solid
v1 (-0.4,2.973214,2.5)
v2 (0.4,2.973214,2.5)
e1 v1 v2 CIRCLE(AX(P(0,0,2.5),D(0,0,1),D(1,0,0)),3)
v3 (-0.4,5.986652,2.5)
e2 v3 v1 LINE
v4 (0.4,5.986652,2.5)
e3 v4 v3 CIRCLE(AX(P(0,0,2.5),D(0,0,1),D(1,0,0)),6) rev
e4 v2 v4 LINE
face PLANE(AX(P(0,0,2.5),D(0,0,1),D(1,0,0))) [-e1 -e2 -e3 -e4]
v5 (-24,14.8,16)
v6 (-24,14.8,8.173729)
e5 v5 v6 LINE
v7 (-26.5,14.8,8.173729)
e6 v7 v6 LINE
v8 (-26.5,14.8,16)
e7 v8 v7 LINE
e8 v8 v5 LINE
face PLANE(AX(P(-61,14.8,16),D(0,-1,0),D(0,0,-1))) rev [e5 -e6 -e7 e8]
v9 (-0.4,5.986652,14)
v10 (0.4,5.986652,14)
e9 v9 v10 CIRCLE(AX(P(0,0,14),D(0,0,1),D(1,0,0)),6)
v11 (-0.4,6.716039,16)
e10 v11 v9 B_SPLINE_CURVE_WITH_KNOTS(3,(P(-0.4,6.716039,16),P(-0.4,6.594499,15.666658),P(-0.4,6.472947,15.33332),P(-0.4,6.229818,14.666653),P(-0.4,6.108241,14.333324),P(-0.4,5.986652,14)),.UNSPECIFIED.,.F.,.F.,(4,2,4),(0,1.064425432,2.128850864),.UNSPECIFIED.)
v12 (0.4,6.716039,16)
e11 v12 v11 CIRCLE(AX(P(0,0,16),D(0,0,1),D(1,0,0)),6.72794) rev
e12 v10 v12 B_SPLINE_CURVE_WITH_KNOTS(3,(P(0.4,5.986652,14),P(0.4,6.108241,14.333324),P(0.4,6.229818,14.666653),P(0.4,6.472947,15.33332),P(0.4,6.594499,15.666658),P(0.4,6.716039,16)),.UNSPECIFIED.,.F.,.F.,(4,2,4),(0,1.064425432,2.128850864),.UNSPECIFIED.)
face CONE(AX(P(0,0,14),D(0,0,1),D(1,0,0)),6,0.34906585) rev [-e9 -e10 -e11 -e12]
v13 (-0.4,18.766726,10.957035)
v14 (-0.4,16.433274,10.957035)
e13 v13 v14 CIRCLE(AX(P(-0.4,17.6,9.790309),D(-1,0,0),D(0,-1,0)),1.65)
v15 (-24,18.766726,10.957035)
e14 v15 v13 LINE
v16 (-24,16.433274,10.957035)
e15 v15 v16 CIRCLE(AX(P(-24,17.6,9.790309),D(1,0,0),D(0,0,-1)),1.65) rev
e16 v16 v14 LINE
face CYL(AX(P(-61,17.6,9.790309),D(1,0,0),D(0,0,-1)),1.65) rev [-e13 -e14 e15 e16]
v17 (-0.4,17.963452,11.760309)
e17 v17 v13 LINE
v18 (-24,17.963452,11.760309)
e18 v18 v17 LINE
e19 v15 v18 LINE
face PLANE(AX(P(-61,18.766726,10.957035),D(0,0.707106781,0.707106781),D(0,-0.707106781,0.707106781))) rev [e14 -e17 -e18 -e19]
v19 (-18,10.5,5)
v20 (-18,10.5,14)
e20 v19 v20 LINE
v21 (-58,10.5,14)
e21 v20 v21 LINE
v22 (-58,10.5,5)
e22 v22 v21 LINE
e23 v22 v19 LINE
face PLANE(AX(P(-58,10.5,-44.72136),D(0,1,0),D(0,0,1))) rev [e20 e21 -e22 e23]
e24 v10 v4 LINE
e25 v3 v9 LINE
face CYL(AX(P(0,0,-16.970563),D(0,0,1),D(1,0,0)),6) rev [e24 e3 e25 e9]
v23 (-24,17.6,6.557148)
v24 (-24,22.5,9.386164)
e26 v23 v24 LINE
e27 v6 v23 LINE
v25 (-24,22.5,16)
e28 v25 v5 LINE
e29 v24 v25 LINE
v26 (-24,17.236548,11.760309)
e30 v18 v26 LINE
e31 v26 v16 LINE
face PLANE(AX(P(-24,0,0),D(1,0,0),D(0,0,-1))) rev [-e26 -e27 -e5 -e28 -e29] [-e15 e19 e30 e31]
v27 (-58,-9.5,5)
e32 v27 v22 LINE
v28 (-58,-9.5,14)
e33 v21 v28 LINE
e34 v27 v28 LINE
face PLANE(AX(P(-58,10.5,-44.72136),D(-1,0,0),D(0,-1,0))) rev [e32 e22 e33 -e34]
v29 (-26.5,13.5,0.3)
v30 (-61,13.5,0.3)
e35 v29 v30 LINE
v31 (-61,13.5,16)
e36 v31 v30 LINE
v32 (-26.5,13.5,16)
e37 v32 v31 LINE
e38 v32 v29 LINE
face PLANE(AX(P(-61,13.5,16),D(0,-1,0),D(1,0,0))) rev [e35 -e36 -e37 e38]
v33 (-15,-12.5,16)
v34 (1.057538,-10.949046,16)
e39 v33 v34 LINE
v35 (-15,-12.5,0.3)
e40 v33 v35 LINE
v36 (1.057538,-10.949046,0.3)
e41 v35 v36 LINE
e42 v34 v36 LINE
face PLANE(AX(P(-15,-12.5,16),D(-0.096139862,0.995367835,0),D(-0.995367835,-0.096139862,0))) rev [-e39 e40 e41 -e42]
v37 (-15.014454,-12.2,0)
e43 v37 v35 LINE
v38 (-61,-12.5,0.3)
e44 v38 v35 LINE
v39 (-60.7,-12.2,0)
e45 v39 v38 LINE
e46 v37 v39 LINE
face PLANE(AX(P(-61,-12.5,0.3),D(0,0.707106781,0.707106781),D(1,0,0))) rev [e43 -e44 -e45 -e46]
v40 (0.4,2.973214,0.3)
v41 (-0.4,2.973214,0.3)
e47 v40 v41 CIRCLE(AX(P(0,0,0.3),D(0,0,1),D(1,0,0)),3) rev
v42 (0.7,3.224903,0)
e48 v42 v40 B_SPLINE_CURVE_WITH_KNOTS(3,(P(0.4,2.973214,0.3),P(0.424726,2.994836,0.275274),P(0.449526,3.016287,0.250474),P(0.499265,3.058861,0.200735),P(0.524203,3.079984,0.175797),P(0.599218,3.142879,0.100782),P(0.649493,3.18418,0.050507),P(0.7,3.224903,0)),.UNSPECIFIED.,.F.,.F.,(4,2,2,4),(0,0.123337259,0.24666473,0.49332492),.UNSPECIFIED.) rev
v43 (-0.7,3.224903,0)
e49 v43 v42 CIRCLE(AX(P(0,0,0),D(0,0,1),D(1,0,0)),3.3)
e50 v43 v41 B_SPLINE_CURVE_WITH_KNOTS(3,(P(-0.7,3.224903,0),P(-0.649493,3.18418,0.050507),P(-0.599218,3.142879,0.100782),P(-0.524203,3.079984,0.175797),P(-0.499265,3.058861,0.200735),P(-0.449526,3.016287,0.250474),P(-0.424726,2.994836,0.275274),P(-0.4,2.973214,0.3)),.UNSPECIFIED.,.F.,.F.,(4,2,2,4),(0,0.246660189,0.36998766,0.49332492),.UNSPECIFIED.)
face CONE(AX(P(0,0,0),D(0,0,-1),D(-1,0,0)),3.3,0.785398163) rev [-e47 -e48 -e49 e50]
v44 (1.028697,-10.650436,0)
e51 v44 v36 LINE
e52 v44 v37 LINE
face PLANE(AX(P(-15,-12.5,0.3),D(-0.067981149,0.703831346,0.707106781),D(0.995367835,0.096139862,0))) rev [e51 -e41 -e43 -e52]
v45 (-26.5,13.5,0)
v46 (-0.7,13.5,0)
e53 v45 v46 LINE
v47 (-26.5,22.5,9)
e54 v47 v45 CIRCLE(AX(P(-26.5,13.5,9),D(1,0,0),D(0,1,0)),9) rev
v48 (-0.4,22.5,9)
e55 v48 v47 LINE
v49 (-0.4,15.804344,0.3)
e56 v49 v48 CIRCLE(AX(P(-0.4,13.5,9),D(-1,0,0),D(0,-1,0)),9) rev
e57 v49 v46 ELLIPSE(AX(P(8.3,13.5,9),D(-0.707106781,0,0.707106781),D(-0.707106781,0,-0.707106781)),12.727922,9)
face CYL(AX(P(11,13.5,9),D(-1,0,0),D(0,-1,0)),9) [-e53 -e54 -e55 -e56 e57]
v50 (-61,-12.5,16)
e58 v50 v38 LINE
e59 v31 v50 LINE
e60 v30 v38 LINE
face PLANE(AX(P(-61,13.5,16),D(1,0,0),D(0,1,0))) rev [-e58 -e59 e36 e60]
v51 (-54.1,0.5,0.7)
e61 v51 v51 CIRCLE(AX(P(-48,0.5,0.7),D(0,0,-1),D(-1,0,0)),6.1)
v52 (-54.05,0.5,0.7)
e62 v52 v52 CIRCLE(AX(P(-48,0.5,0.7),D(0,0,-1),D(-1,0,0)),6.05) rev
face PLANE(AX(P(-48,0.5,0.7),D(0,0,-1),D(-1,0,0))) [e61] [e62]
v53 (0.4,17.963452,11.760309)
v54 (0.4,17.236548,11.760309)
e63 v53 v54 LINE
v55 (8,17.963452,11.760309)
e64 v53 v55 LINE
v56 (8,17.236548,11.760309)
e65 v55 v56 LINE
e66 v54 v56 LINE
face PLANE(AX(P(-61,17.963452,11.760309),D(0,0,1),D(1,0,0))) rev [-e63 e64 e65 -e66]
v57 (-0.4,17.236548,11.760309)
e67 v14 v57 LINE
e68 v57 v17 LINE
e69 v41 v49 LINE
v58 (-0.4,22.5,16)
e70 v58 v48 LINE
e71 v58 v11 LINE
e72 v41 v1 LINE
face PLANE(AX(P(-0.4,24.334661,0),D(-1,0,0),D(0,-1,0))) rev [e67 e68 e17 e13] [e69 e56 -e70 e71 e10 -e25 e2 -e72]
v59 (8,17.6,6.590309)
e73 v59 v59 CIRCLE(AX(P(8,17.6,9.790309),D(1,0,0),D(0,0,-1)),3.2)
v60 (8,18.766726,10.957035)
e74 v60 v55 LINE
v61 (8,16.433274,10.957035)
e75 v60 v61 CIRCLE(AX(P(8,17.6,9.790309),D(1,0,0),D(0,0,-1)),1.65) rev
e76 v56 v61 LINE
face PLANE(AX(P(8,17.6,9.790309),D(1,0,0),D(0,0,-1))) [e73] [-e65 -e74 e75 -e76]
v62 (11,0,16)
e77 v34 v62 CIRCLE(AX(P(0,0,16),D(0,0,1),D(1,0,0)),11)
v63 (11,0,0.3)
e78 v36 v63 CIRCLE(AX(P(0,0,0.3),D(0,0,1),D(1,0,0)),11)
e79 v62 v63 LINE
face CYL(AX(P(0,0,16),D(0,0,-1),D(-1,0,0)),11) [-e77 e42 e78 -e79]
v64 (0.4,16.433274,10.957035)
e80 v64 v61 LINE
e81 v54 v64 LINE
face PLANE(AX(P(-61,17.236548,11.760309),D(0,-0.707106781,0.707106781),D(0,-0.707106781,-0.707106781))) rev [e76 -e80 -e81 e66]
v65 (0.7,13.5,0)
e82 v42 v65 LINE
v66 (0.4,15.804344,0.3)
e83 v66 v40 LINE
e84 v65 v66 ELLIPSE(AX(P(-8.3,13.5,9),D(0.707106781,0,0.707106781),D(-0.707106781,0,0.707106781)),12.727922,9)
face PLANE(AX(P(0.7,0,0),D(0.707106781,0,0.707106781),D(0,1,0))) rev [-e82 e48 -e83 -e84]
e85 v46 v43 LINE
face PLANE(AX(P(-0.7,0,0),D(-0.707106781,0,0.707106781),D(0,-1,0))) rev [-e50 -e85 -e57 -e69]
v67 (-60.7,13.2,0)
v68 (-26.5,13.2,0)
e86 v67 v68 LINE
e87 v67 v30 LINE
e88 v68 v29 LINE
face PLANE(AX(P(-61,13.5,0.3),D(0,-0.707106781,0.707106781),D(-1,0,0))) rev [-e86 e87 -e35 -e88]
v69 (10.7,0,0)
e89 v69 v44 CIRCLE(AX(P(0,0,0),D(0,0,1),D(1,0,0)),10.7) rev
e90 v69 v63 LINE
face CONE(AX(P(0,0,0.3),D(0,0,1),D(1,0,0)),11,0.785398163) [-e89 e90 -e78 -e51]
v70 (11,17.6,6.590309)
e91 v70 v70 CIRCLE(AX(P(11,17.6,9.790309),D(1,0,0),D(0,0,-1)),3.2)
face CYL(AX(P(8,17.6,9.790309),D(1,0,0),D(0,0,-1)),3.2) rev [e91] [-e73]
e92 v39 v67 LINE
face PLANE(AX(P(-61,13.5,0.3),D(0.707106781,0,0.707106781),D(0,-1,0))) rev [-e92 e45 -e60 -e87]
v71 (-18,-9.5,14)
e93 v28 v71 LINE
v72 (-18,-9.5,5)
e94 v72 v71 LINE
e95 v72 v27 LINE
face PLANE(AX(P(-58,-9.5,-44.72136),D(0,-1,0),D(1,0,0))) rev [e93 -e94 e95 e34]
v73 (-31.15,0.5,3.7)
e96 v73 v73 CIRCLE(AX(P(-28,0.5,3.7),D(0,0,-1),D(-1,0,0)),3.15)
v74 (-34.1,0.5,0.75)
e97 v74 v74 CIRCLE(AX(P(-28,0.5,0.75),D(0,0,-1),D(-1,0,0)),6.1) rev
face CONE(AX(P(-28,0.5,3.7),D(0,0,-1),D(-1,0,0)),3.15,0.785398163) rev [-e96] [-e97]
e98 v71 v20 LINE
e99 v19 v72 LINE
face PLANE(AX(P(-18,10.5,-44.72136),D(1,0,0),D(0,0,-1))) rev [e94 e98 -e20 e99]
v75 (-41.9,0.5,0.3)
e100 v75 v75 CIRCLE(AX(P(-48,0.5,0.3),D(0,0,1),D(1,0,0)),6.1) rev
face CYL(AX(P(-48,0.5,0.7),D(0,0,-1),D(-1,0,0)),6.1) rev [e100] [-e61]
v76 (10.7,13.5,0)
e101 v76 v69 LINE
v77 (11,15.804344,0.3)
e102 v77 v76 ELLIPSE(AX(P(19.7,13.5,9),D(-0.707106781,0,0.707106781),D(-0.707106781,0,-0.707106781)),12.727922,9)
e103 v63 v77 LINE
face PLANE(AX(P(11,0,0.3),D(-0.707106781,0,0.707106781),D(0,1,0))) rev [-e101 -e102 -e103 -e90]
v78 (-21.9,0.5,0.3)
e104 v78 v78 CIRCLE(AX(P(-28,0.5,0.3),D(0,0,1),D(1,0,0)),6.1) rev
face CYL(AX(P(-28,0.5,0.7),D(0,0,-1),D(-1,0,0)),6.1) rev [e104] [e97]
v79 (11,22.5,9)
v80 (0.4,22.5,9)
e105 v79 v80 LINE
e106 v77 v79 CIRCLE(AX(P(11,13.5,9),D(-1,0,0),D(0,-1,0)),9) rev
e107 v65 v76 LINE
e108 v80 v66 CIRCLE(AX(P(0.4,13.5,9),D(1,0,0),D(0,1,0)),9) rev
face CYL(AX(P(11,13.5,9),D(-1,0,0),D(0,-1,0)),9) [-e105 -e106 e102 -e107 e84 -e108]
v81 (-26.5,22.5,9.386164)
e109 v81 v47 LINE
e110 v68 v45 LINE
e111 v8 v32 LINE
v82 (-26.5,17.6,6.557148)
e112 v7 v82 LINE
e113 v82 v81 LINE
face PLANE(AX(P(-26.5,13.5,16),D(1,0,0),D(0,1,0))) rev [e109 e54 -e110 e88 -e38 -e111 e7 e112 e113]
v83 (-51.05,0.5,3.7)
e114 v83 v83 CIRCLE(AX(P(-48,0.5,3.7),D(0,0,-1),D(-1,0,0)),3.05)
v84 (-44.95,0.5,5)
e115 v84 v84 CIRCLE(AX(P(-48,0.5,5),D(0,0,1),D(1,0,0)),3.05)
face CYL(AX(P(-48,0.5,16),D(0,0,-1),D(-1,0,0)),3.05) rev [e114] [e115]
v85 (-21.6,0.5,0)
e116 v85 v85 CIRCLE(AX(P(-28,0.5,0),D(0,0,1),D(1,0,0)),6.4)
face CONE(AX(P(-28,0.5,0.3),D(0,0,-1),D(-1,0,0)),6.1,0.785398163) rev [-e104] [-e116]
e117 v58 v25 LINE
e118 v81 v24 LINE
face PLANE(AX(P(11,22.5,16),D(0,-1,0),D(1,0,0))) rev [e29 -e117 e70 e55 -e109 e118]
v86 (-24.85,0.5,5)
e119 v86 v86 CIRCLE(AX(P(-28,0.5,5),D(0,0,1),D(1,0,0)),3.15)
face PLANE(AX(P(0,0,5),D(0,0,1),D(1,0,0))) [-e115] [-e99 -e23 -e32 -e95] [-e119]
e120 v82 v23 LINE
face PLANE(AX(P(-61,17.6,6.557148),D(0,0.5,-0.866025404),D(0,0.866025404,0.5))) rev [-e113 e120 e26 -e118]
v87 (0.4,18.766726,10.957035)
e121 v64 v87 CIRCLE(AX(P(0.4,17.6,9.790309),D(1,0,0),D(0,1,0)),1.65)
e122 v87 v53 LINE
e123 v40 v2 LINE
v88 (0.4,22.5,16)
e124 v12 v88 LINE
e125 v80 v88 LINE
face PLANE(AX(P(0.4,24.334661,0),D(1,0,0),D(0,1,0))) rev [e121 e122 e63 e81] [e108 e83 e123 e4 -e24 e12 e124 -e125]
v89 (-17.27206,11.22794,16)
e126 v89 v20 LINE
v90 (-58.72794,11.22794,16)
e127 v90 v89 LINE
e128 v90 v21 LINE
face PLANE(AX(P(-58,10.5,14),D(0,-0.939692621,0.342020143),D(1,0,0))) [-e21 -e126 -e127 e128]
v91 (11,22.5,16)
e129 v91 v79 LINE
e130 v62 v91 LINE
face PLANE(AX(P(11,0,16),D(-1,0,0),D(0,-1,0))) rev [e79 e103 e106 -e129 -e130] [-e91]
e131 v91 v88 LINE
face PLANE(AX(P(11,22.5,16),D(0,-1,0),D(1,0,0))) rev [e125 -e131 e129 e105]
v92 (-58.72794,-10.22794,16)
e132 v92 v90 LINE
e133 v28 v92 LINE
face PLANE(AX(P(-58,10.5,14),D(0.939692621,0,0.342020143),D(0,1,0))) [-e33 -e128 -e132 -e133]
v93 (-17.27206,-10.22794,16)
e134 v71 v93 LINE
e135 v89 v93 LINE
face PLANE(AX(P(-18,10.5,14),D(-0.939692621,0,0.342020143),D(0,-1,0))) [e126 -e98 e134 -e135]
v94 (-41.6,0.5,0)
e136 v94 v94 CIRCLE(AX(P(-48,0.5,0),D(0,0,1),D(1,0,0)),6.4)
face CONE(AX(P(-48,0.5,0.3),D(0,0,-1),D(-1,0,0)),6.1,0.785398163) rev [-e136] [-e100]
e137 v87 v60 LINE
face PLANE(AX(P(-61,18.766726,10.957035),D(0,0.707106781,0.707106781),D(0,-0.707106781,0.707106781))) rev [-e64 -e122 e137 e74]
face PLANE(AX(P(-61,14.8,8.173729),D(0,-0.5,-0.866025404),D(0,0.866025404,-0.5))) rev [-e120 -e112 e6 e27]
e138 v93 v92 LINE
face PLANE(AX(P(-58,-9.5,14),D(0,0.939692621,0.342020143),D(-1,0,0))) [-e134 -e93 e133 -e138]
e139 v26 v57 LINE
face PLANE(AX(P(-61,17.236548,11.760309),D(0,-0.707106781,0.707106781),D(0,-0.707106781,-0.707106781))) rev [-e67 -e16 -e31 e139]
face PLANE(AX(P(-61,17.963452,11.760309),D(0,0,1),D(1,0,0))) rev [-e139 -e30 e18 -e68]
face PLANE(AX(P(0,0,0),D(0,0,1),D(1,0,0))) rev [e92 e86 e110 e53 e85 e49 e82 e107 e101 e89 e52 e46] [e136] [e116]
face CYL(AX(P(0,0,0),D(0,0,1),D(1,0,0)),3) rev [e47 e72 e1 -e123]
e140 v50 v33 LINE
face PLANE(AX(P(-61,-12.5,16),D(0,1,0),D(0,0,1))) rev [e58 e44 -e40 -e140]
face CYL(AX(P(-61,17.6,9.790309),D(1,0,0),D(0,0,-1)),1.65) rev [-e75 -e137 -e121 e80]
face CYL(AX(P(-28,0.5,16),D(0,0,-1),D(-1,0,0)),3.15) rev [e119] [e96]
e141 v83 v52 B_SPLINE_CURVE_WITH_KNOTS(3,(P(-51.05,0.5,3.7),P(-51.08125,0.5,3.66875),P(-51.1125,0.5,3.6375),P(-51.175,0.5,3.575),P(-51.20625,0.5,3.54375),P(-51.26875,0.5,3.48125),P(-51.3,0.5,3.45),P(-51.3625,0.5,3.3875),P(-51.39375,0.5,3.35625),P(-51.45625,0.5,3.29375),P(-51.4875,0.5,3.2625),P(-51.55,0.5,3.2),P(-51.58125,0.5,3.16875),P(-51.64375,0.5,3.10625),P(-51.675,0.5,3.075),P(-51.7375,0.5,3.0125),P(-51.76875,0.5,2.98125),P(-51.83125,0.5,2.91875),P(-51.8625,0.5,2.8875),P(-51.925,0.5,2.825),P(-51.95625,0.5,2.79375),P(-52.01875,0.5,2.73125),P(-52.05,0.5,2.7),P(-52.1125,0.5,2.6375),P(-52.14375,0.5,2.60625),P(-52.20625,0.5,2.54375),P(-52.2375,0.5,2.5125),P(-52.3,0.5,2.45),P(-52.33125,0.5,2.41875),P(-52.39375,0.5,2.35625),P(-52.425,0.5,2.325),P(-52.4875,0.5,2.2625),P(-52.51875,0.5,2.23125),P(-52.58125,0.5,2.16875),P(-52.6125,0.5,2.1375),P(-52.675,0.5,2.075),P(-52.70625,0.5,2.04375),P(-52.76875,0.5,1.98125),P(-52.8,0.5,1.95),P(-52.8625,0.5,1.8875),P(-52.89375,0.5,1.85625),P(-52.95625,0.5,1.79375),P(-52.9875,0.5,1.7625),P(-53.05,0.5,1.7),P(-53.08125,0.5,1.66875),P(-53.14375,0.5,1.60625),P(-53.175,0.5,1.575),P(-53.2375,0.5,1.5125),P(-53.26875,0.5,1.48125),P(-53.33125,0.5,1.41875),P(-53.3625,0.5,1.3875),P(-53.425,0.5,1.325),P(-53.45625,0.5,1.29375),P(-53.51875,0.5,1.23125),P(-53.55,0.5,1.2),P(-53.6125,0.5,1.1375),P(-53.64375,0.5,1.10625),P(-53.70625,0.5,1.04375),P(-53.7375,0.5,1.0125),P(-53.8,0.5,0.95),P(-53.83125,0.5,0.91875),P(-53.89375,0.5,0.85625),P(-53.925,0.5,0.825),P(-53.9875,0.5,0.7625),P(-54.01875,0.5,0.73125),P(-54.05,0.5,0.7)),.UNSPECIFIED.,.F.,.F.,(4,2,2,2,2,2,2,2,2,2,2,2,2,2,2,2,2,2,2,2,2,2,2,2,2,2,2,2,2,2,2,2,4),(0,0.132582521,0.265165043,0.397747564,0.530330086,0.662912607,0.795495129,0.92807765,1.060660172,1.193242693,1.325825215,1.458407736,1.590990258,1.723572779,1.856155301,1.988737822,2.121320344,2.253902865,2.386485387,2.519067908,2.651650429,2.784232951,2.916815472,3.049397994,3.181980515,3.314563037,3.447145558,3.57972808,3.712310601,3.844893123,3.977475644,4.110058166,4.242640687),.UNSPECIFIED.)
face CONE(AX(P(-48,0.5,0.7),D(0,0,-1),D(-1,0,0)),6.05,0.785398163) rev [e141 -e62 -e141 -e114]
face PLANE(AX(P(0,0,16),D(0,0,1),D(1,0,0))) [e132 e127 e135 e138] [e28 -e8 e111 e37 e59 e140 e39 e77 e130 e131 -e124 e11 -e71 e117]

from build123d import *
from OCP.BRepFilletAPI import BRepFilletAPI_MakeChamfer

# Parameters (mm, degrees)
SKETCH1_R           = 2.5
SKETCH1_R_2         = 3.15
BOSS_EXTRUDE1_DEPTH = 16
SKETCH2_W           = 40
SKETCH2_H           = 20
CUT_EXTRUDE1_DEPTH  = 11
FILLET2_R           = 9
SKETCH3_R           = 6
CUT_EXTRUDE2_DEPTH  = 13.5
CUT_EXTRUDE5_DEPTH  = 67.957075802
SKETCH7_R           = 3.05
CUT_EXTRUDE6_DEPTH  = 67.957075802
CHAMFER2_SIZE       = 2
CHAMFER2_SIZE2      = 0.727940469
SKETCH10_R          = 6.1
CUT_EXTRUDE8_DEPTH  = 0.7
CHAMFER3_SIZE       = 3
CHAMFER4_SIZE       = 0.3
SKETCH11_R          = 1.65
CUT_EXTRUDE9_DEPTH  = 78.111931632
SKETCH12_R          = 3.2
CUT_EXTRUDE10_DEPTH = 3
CUT_EXTRUDE11_START = -35
CUT_EXTRUDE11_DEPTH = 43.111931632
CHAMFER5_SIZE       = 2
CHAMFER5_SIZE2      = 0.727940469
CUT_EXTRUDE12_DEPTH = 78.111931632


with BuildPart() as part:
    # Sketch1 → Boss-Extrude1 (new body)
    with BuildSketch(Plane.XY):
        with BuildLine():
            Line((-61, 13.5), (-61, -12.5))
            Line((-61, -12.5), (-15, -12.5))
            Line((-15, -12.5), (1.057538487, -10.949046184))
            ThreePointArc((1.057538487, -10.949046184), (8.143491983, -7.394831866), (11, 0))
            Line((11, 0), (11, 22.5))
            Line((11, 22.5), (-26.5, 22.5))
            Line((-26.5, 22.5), (-26.5, 13.5))
            Line((-26.5, 13.5), (-61, 13.5))
        make_face()
        with Locations((-48, 0.5)):
            Circle(SKETCH1_R, mode=Mode.SUBTRACT)
        with Locations((-28, 0.5)):
            Circle(SKETCH1_R_2, mode=Mode.SUBTRACT)
    extrude(amount=BOSS_EXTRUDE1_DEPTH)

    # Sketch2 → Cut-Extrude1 (cut)
    with BuildSketch(Plane.XY.offset(16)):
        with Locations((-38, 0.5)):
            Rectangle(SKETCH2_W, SKETCH2_H)
    extrude(amount=-CUT_EXTRUDE1_DEPTH, mode=Mode.SUBTRACT)

    # Fillet2
    fillet2_edges = [part.edges().sort_by_distance(p)[0] for p in [
        (-7.75, 22.5, 0),
    ]]
    fillet(fillet2_edges, radius=FILLET2_R)

    # Sketch3 → Cut-Extrude2 (cut)
    with BuildSketch(Plane.XY.offset(16)):
        Circle(SKETCH3_R)
    extrude(amount=-CUT_EXTRUDE2_DEPTH, mode=Mode.SUBTRACT)

    # Sketch6 → Cut-Extrude5 (cut, through all)
    with BuildSketch(Plane.XY.offset(16)):
        with BuildLine():
            Line((-0.4, 24.334661422), (0.4, 24.334661422))
            Line((0.4, 24.334661422), (0.4, 2.973213749))
            ThreePointArc((0.4, 2.973213749), (0, -3), (-0.4, 2.973213749))
            Line((-0.4, 2.973213749), (-0.4, 24.334661422))
        make_face()
    extrude(amount=-CUT_EXTRUDE5_DEPTH, mode=Mode.SUBTRACT)

    # Sketch7 → Cut-Extrude6 (cut, through all)
    with BuildSketch(Plane(origin=(0, 0, 0), x_dir=(-1, 0, 0), z_dir=(0, 0, -1))):
        with Locations((48, 0.5)):
            Circle(SKETCH7_R)
    extrude(amount=-CUT_EXTRUDE6_DEPTH, mode=Mode.SUBTRACT)

    # Chamfer2: one chamfer whose edges measure the first distance from different faces: ONE call of the kernel's chamfer builder (chamfer() names one face for all edges)
    chamfer2_edges_1 = [part.edges().sort_by_distance(p)[0] for p in [
        (-58, 0.5, 16),
    ]]
    chamfer2_side_1 = [part.faces().sort_by_distance(p)[0] for p in [
        (-58, 0.5, 10.5),
    ]]
    chamfer2_edges_2 = [part.edges().sort_by_distance(p)[0] for p in [
        (-38, -9.5, 16),
    ]]
    chamfer2_side_2 = [part.faces().sort_by_distance(p)[0] for p in [
        (-38, -9.5, 10.5),
    ]]
    chamfer2_edges_3 = [part.edges().sort_by_distance(p)[0] for p in [
        (-18, 0.5, 16),
    ]]
    chamfer2_side_3 = [part.faces().sort_by_distance(p)[0] for p in [
        (-18, 0.5, 10.5),
    ]]
    chamfer2_edges_4 = [part.edges().sort_by_distance(p)[0] for p in [
        (-38, 10.5, 16),
    ]]
    chamfer2_side_4 = [part.faces().sort_by_distance(p)[0] for p in [
        (-38, 10.5, 10.5),
    ]]
    chamfer2 = BRepFilletAPI_MakeChamfer(part.part.solid().wrapped)
    for e in chamfer2_edges_1:
        chamfer2.Add(CHAMFER2_SIZE, CHAMFER2_SIZE2, e.wrapped, chamfer2_side_1[0].wrapped)  # the first distance lies on this face
    for e in chamfer2_edges_2:
        chamfer2.Add(CHAMFER2_SIZE, CHAMFER2_SIZE2, e.wrapped, chamfer2_side_2[0].wrapped)  # the first distance lies on this face
    for e in chamfer2_edges_3:
        chamfer2.Add(CHAMFER2_SIZE, CHAMFER2_SIZE2, e.wrapped, chamfer2_side_3[0].wrapped)  # the first distance lies on this face
    for e in chamfer2_edges_4:
        chamfer2.Add(CHAMFER2_SIZE, CHAMFER2_SIZE2, e.wrapped, chamfer2_side_4[0].wrapped)  # the first distance lies on this face
    add(Compound.cast(chamfer2.Shape()), mode=Mode.REPLACE)

    # Sketch10 → Cut-Extrude8 (cut)
    with BuildSketch(Plane(origin=(0, 0, 0), x_dir=(-1, 0, 0), z_dir=(0, 0, -1))):
        with Locations((28, 0.5)):
            Circle(SKETCH10_R)
        with Locations((48, 0.5)):
            Circle(SKETCH10_R)
    extrude(amount=-CUT_EXTRUDE8_DEPTH, mode=Mode.SUBTRACT)

    # Chamfer3
    # the kernel refuses this chamfer: 3 mm, written as the material it takes off along each edge
    with BuildSketch(Plane(origin=(-48, 0.5, 0.7), x_dir=(-1, 0, 0), z_dir=(0, -1, 0))) as chamfer3_piece_1:
        Polygon((3.05, -CHAMFER3_SIZE), (3.05 + CHAMFER3_SIZE, 0), (3.05, 0), align=None)
    revolve(axis=Axis((-48, 0.5, 0.7), (0, 0, -1)), mode=Mode.SUBTRACT)
    with BuildSketch(Plane(origin=(-28, 0.5, 0.7), x_dir=(1, 0, 0), z_dir=(0, 1, 0))) as chamfer3_piece_2_section:
        Polygon((3.15, -CHAMFER3_SIZE), (3.15 + CHAMFER3_SIZE, 0), (3.15, 0), align=None)
    chamfer3_piece_2 = revolve(axis=Axis((-28, 0.5, 0.7), (0, 0, -1)), mode=Mode.PRIVATE)
    chamfer3_piece_2 = chamfer3_piece_2 & Plane(origin=(-28, 0.5, 0.7), x_dir=(-1, 0, 0), z_dir=(0, 0, -1)) * Cylinder(6.1, 25, mode=Mode.PRIVATE)
    add(chamfer3_piece_2, mode=Mode.SUBTRACT)

    # Chamfer4
    # the kernel refuses this chamfer: 0.3 mm, written as the material it takes off along each edge
    with BuildSketch(Plane(origin=(0, 0, 0), x_dir=(-0.0031415874858789867, 0.9999950652018582, 0), z_dir=(0.9999950652018582, 0.0031415874858789867, 0))) as chamfer4_piece_1:
        Polygon((3 + CHAMFER4_SIZE, 0), (3, CHAMFER4_SIZE), (3, 0), align=None)
    revolve(axis=Axis((0, 0, 0), (0, 0, 1)), revolution_arc=359.64, mode=Mode.SUBTRACT)
    with BuildSketch(Plane(origin=(-61, 14.271504896, 0), x_dir=(1, 0, 0), z_dir=(0, -1, 0))) as chamfer4_piece_2:
        Polygon((CHAMFER4_SIZE, 0), (0, CHAMFER4_SIZE), (0, 0), align=None)
    extrude(amount=27.543009793, mode=Mode.SUBTRACT)
    with BuildSketch(Plane(origin=(-61.771504896, -12.5, 0), x_dir=(0, 1, 0), z_dir=(1, 0, 0))) as chamfer4_piece_3:
        Polygon((CHAMFER4_SIZE, 0), (0, CHAMFER4_SIZE), (0, 0), align=None)
    extrude(amount=50.629029378, mode=Mode.SUBTRACT)
    with BuildSketch(Plane(origin=(-18.839655792, -12.870861873, 0), x_dir=(-0.0961398624557926, 0.9953678349469514, 0), z_dir=(0.9953678349469514, 0.09613986245579259, 0))) as chamfer4_piece_4:
        Polygon((CHAMFER4_SIZE, 0), (0, CHAMFER4_SIZE), (0, 0), align=None)
    extrude(amount=19.989790287, mode=Mode.SUBTRACT)
    with BuildSketch(Plane(origin=(0, 0, 0), x_dir=(0.0961398624557928, -0.9953678349469512, 0), z_dir=(-0.9953678349469512, -0.0961398624557928, 0))) as chamfer4_piece_5:
        Polygon((11 - CHAMFER4_SIZE, 0), (11, CHAMFER4_SIZE), (11, 0), align=None)
    revolve(axis=Axis((0, 0, 0), (0, 0, 1)), revolution_arc=84.483070562, mode=Mode.SUBTRACT)
    with BuildSketch(Plane(origin=(-28, 0.5, 0), x_dir=(-1, 0, 0), z_dir=(0, -1, 0))) as chamfer4_piece_6:
        Polygon((6.1 + CHAMFER4_SIZE, 0), (6.1, -CHAMFER4_SIZE), (6.1, 0), align=None)
    revolve(axis=Axis((-28, 0.5, 0), (0, 0, -1)), mode=Mode.SUBTRACT)
    with BuildSketch(Plane(origin=(-48, 0.5, 0), x_dir=(-1, 0, 0), z_dir=(0, -1, 0))) as chamfer4_piece_7:
        Polygon((6.1 + CHAMFER4_SIZE, 0), (6.1, -CHAMFER4_SIZE), (6.1, 0), align=None)
    revolve(axis=Axis((-48, 0.5, 0), (0, 0, -1)), mode=Mode.SUBTRACT)
    with BuildSketch(Plane(origin=(0.4, 17.357524482, 0), x_dir=(1, 0, 0), z_dir=(0, -1, 0)), Plane(origin=(-0.4, 2.201708853, 0), x_dir=(-1, 0, 0), z_dir=(0, 1, 0))) as chamfer4_piece_8:
        Polygon((CHAMFER4_SIZE, 0), (0, CHAMFER4_SIZE), (0, 0), align=None)
    extrude(amount=15.155815629, mode=Mode.SUBTRACT)
    with BuildSketch(Plane(origin=(11, 0, 0), x_dir=(0, 0, 1), z_dir=(0, 1, 0))) as chamfer4_piece_9:
        Polygon((CHAMFER4_SIZE, 0), (0, -CHAMFER4_SIZE), (0, 0), align=None)
    extrude(amount=17.357524482, mode=Mode.SUBTRACT)
    with BuildSketch(Plane(origin=(-26.5, 13.5, 0), x_dir=(0, -1, 0), z_dir=(-1, 0, 0))) as chamfer4_piece_10:
        Polygon((CHAMFER4_SIZE, 0), (0, CHAMFER4_SIZE), (0, 0), align=None)
    extrude(amount=35.271504896, mode=Mode.SUBTRACT)

    # Sketch11 → Cut-Extrude9 (cut, through all)
    with BuildSketch(Plane(origin=(11, 0, 0), x_dir=(0, 0, -1), z_dir=(1, 0, 0))):
        with Locations((-9.790309274, 17.6)):
            Circle(SKETCH11_R)
    extrude(amount=-CUT_EXTRUDE9_DEPTH, mode=Mode.SUBTRACT)

    # Sketch12 → Cut-Extrude10 (cut)
    with BuildSketch(Plane(origin=(11, 0, 0), x_dir=(0, 0, -1), z_dir=(1, 0, 0))):
        with Locations((-9.790309274, 17.6)):
            Circle(SKETCH12_R)
    extrude(amount=-CUT_EXTRUDE10_DEPTH, mode=Mode.SUBTRACT)

    # Sketch13 → Cut-Extrude11 (cut, through all)
    with BuildSketch(Plane(origin=(11, 0, 0), x_dir=(0, 0, -1), z_dir=(1, 0, 0)).offset(CUT_EXTRUDE11_START)):
        Polygon((-9.386164085, 22.5), (-16, 22.5), (-16, 14.8), (-8.17372852, 14.8), (-6.557147766, 17.6), align=None)
    extrude(amount=-CUT_EXTRUDE11_DEPTH, mode=Mode.SUBTRACT)

    # Chamfer5
    chamfer5_edges = [part.edges().sort_by_distance(p)[0] for p in [
        (-4.098780306, -4.38178046, 16),
    ]]
    chamfer5_side = [part.faces().sort_by_distance(p)[0] for p in [
        (-4.098780306, -4.38178046, 9.25),
    ]]
    chamfer(chamfer5_edges, length=CHAMFER5_SIZE, length2=CHAMFER5_SIZE2, reference=chamfer5_side[0])

    # Sketch14 → Cut-Extrude12 (cut, through all)
    with BuildSketch(Plane(origin=(11, 0, 0), x_dir=(0, 0, -1), z_dir=(1, 0, 0))):
        Polygon((-9.790309274, 17.6), (-10.957035463, 18.766726189), (-11.760309274, 17.963452378), (-11.760309274, 17.236547622), (-10.957035463, 16.433273811), align=None)
    extrude(amount=-CUT_EXTRUDE12_DEPTH, mode=Mode.SUBTRACT)


solid = part.part
